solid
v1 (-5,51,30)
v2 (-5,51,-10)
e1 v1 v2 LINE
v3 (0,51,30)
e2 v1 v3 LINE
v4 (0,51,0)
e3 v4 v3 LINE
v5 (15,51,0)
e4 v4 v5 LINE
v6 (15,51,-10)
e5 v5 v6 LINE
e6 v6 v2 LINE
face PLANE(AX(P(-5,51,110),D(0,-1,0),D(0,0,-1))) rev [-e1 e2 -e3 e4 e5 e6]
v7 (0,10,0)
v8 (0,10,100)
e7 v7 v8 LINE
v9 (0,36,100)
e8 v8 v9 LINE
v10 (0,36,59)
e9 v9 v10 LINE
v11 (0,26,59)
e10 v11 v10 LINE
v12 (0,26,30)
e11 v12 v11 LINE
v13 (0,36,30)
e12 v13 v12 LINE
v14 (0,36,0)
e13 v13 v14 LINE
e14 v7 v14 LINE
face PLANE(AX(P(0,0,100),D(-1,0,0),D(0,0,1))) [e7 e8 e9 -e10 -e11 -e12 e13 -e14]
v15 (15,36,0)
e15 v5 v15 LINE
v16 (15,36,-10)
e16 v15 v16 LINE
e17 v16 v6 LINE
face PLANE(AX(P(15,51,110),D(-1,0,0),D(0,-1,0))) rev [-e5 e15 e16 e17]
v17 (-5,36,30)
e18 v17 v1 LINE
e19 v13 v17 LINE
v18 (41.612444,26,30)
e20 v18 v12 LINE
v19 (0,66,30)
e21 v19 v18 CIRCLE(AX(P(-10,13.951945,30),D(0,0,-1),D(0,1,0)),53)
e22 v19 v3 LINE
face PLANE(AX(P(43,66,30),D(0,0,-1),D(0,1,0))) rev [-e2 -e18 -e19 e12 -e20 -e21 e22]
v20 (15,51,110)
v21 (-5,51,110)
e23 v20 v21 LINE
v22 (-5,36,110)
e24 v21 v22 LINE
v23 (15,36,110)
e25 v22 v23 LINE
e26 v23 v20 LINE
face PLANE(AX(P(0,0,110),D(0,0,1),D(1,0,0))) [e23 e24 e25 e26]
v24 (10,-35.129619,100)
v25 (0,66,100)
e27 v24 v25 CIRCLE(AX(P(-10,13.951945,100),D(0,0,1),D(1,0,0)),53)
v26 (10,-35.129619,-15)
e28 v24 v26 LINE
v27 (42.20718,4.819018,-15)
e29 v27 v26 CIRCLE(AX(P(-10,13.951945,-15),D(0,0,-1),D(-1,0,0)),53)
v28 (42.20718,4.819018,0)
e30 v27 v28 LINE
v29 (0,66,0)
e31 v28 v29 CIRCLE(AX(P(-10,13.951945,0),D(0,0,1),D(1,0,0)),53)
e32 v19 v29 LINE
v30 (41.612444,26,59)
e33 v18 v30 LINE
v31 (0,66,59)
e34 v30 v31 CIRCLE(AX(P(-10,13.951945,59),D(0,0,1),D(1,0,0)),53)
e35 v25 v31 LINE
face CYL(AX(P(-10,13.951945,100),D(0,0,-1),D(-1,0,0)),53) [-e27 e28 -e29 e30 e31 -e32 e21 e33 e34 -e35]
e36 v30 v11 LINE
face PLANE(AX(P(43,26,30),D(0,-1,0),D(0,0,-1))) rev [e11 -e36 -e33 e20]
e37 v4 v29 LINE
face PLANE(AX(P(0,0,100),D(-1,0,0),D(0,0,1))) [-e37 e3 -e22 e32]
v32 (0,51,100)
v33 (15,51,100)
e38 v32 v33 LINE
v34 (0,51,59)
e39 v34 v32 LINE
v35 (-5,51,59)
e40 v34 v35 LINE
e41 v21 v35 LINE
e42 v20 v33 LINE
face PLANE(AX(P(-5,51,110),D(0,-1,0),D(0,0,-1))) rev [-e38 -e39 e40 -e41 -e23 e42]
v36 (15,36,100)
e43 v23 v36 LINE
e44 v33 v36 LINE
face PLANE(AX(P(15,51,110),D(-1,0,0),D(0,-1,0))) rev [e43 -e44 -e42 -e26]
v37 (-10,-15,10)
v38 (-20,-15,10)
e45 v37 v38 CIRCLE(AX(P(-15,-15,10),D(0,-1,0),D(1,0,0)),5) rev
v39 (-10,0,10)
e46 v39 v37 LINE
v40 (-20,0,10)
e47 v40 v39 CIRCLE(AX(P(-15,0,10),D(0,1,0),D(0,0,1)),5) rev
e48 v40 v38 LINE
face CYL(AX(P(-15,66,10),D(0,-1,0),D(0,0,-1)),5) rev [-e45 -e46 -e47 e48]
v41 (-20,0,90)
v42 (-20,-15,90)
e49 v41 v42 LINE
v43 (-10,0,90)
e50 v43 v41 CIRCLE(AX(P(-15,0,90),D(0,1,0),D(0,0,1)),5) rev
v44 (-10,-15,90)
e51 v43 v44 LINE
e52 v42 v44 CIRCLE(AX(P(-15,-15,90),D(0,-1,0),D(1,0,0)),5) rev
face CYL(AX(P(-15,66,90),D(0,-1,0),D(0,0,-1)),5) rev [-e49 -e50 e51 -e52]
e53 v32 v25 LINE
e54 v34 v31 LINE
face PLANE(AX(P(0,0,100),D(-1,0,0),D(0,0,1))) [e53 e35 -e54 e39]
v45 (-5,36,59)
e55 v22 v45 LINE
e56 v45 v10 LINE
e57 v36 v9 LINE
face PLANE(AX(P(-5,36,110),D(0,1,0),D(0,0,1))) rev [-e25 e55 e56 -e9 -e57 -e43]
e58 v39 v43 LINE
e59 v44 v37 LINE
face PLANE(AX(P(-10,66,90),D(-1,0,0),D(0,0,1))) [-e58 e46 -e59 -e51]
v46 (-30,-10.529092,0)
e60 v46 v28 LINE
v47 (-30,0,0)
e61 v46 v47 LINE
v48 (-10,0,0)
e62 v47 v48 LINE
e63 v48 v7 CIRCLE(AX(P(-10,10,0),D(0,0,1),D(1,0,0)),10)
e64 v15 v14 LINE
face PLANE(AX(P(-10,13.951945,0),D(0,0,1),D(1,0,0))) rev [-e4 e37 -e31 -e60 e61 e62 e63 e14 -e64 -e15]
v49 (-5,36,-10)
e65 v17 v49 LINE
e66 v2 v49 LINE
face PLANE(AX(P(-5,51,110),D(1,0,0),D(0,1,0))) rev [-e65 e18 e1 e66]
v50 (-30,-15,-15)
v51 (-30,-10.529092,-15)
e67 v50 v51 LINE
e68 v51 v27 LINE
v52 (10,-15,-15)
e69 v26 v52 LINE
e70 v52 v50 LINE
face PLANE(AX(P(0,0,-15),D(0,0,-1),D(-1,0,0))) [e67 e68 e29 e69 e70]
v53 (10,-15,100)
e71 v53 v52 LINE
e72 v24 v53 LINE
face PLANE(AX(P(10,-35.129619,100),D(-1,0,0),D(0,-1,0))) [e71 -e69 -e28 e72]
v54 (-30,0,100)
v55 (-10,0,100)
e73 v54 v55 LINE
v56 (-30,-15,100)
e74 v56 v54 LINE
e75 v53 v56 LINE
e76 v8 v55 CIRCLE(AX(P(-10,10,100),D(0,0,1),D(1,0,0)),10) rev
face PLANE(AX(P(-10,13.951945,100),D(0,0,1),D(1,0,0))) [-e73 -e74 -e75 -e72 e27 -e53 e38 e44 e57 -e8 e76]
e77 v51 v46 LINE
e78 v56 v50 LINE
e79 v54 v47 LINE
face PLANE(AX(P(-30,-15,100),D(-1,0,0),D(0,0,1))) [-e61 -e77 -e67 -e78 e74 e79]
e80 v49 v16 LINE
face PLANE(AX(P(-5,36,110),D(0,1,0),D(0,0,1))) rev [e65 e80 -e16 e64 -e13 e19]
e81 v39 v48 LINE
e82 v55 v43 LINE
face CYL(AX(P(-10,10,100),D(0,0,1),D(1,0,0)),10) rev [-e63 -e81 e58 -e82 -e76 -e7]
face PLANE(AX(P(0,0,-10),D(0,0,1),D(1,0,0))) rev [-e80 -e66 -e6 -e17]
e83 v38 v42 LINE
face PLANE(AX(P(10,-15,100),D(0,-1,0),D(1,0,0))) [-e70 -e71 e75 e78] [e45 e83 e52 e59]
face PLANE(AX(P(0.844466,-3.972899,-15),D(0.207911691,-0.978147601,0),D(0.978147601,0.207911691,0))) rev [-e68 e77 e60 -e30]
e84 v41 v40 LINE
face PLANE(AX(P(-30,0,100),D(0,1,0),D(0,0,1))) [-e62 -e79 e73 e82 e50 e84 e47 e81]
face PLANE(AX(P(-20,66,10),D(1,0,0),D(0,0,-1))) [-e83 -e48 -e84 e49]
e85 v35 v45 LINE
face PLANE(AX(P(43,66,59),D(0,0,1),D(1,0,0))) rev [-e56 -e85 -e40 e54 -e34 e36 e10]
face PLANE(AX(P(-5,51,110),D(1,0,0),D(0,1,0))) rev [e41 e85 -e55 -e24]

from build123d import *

# Parameters (mm, degrees)
BOSS_EXTRUDE1_DEPTH            = 100
BOSS_EXTRUDE2_START            = 15
BOSS_EXTRUDE2_DEPTH            = 15
CUT_EXTRUDE1_REACH             = 129.299
CUT_EXTRUDE1_DIRECTION_2_DEPTH = 128.298860953
BOSS_EXTRUDE3_DEPTH            = 10
BOSS_EXTRUDE3_DEPTH_BACK       = 110
SKETCH5_W                      = 20
SKETCH5_H                      = 15
CUT_EXTRUDE2_DEPTH             = 136.295971854
CUT_EXTRUDE2_DEPTH_BACK        = 136.295971854
SKETCH6_W                      = 29
SKETCH6_H                      = 40
FILLET1_R                      = 10


with BuildPart() as part:
    # Sketch1 → Boss-Extrude1 (new body)
    with BuildSketch(Plane.XY):
        with BuildLine():
            Line((10, -35.129619486), (10, -15))
            Line((10, -15), (-30, -15))
            Line((-30, -15), (-30, 0))
            Line((-30, 0), (0, 0))
            Line((0, 0), (0, 66))
            ThreePointArc((0, 66), (42.742771868, 19.167308707), (10, -35.129619486))
        make_face()
    extrude(amount=BOSS_EXTRUDE1_DEPTH)

    # Sketch2 → Boss-Extrude2 (add)
    with BuildSketch(Plane(origin=(0, 0, 0), x_dir=(-1, 0, 0), z_dir=(0, 0, -1)).offset(BOSS_EXTRUDE2_START)):
        with BuildLine():
            Line((30, -15), (30, -10.52909236))
            Line((30, -10.52909236), (-42.207179875, 4.819017522))
            ThreePointArc((-42.207179875, 4.819017522), (-31.260666573, -19.313012165), (-10, -35.129619486))
            Line((-10, -35.129619486), (-10, -15))
            Line((-10, -15), (30, -15))
        make_face()
    extrude(amount=-BOSS_EXTRUDE2_DEPTH)

    # Sketch4 → Cut-Extrude1 (cut, up to next)
    with BuildSketch(Plane(origin=(0, 0, 0), x_dir=(1, 0, 0), z_dir=(0, 1, 0)), mode=Mode.PRIVATE) as cut_extrude1_sk1:
        with BuildLine():
            Line((-20, -10), (-20, -90))
            ThreePointArc((-20, -90), (-15, -95), (-10, -90))
            Line((-10, -90), (-10, -10))
            ThreePointArc((-10, -10), (-15, -5), (-20, -10))
        make_face()
    cut_extrude1_tool1 = extrude(cut_extrude1_sk1.sketch, amount=-CUT_EXTRUDE1_REACH, mode=Mode.PRIVATE) & part.part
    add(cut_extrude1_tool1.solids().sort_by_distance((-15, 0, 50))[0], mode=Mode.SUBTRACT)

    # Sketch4 → Cut-Extrude1 direction 2 (cut)
    with BuildSketch(Plane(origin=(0, 0, 0), x_dir=(1, 0, 0), z_dir=(0, 1, 0))):
        with BuildLine():
            Line((-20, -10), (-20, -90))
            ThreePointArc((-20, -90), (-15, -95), (-10, -90))
            Line((-10, -90), (-10, -10))
            ThreePointArc((-10, -10), (-15, -5), (-20, -10))
        make_face()
    extrude(amount=CUT_EXTRUDE1_DIRECTION_2_DEPTH, mode=Mode.SUBTRACT)

    # Sketch5 → Boss-Extrude3 (add, two sides: drawn at the far end of the back side and taken through both)
    with BuildSketch(Plane.XY.offset(100).offset(-BOSS_EXTRUDE3_DEPTH_BACK)):
        with Locations((5, 43.5)):
            Rectangle(SKETCH5_W, SKETCH5_H)
    extrude(amount=BOSS_EXTRUDE3_DEPTH + BOSS_EXTRUDE3_DEPTH_BACK)

    # Sketch6 → Cut-Extrude2 (cut, two sides: drawn at the far end of the back side and taken through both)
    with BuildSketch(Plane.ZY.offset(-CUT_EXTRUDE2_DEPTH_BACK)):
        with Locations((44.5, 46)):
            Rectangle(SKETCH6_W, SKETCH6_H)
    extrude(amount=CUT_EXTRUDE2_DEPTH + CUT_EXTRUDE2_DEPTH_BACK, mode=Mode.SUBTRACT)

    # Fillet1
    fillet1_edges = [part.edges().sort_by_distance(p)[0] for p in [
        (0, 0, 50),
    ]]
    fillet(fillet1_edges, radius=FILLET1_R - 0.0001)  # a hair under: the kernel refuses the full size


solid = part.part
